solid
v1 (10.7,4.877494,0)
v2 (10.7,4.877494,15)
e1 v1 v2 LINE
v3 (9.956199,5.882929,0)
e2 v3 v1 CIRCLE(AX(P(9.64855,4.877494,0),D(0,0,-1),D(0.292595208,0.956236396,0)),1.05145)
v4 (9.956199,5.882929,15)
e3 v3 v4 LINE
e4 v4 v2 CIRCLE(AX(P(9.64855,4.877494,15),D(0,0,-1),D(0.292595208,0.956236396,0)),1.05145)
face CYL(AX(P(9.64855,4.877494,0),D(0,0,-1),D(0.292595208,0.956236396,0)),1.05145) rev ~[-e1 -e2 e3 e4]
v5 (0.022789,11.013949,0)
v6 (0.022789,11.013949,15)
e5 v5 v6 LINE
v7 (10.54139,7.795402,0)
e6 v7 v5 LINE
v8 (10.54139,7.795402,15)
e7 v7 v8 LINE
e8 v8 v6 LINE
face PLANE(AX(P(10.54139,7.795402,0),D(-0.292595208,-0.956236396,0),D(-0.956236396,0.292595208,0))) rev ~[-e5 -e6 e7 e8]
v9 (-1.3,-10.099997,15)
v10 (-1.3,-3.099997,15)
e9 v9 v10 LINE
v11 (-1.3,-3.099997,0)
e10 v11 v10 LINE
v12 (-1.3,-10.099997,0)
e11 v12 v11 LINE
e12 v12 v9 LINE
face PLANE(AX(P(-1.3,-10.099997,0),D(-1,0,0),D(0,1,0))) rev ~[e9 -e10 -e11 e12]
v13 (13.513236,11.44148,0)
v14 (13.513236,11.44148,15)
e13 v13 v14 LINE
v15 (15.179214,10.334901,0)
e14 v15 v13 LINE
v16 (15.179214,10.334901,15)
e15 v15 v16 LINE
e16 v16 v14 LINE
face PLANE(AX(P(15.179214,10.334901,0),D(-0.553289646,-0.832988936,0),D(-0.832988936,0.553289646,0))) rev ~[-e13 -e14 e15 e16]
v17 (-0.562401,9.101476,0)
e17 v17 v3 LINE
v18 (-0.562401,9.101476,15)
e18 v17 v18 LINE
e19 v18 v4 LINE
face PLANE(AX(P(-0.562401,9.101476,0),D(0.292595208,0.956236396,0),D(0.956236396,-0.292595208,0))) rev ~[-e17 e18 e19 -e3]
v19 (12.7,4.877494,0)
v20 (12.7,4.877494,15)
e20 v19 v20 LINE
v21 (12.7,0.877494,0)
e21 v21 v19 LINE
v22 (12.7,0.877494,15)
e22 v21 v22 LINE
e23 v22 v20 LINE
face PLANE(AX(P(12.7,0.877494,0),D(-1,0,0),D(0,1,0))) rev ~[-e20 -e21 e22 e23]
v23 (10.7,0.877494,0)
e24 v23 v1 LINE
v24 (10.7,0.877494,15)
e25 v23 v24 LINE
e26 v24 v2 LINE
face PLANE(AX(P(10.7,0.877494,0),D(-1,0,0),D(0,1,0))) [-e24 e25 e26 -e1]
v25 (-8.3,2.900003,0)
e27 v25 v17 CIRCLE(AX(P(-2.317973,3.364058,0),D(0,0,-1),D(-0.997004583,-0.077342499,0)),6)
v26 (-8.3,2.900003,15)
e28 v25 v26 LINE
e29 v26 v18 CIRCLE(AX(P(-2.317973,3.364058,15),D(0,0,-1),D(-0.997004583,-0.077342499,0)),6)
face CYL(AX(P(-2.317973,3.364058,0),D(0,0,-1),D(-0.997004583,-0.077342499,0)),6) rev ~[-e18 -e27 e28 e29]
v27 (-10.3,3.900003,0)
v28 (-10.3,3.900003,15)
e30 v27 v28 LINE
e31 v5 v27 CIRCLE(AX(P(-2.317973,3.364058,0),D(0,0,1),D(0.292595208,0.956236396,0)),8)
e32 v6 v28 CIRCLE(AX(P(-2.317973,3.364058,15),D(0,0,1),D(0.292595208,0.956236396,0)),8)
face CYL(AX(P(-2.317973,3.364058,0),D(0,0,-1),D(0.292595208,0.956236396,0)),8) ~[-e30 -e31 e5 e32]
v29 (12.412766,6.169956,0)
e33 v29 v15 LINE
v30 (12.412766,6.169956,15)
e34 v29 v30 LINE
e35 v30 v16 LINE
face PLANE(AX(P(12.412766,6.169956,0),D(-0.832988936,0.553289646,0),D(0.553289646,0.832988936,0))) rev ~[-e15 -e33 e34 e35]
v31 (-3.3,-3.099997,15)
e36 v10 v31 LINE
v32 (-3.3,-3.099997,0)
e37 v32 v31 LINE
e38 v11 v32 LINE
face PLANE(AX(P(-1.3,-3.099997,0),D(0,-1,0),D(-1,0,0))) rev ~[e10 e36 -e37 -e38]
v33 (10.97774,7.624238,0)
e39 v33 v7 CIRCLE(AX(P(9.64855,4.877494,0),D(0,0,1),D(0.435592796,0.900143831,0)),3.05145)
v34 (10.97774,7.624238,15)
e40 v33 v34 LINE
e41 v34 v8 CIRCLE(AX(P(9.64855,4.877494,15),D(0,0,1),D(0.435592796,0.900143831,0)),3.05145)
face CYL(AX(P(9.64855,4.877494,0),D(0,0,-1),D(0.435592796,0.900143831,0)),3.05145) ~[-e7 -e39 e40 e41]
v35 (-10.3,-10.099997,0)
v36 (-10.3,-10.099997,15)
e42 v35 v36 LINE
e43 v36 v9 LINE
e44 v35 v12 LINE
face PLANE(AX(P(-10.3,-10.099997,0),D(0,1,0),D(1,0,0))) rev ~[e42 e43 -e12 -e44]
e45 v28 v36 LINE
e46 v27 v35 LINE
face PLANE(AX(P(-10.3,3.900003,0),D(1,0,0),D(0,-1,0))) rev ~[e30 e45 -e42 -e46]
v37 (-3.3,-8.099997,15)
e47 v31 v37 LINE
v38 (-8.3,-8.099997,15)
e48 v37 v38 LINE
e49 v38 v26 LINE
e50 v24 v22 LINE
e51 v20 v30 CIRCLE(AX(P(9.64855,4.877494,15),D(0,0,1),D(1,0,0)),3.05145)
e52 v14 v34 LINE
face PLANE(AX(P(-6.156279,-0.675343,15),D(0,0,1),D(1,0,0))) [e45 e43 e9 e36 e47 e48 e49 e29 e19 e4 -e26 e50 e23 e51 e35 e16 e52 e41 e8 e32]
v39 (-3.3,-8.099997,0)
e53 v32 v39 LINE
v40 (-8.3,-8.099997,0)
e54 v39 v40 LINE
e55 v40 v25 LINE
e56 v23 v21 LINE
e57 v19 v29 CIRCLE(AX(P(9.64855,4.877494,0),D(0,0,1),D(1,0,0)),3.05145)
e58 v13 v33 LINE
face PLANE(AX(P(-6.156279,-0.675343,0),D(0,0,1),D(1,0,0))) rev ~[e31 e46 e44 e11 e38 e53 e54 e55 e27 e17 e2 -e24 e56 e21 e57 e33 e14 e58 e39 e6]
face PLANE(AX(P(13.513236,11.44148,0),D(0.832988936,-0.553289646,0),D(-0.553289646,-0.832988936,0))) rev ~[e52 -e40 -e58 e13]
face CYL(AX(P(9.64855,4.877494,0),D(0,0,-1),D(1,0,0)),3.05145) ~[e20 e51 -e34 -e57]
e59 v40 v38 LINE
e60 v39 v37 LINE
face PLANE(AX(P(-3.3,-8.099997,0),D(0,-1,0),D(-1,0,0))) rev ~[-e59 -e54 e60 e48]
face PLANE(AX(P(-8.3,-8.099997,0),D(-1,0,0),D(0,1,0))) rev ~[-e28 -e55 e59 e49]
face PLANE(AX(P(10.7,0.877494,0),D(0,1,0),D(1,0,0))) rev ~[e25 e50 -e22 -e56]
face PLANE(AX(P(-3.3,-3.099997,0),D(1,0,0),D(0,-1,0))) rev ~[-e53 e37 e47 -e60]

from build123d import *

# Parameters (mm, degrees)
F0_W     = 2
F0_H     = 4
F1_DEPTH = 15
F2_W     = 2
F2_H     = 4
F3_DEPTH = 15


# Not quite as in the source:
# - a feature names something its author has since deleted; it is built from what else it names


with BuildPart() as f1:
    # F0 (on Top) → F1 (new body)
    with BuildSketch(Plane.XY):
        with BuildLine():
            Line((7, 32.0000030547), (2, 32.0000030547))
            Line((2, 32.0000030547), (2, 43.0000030547))
            ThreePointArc((2, 43.0000030547), (4.22965477, 48.1459058579), (9.7375987459, 49.20147642))
            Line((9.7375987459, 49.20147642), (10.3227891625, 51.113949211))
            ThreePointArc((10.3227891625, 51.113949211), (3.4424209582, 50.0513163902), (0, 44.0000030547))
            Line((0, 44.0000030547), (0, 30.0000030547))
            Line((0, 30.0000030547), (9, 30.0000030547))
            Line((9, 30.0000030547), (9, 37.0000030547))
            Line((9, 37.0000030547), (7, 37.0000030547))
            Line((7, 37.0000030547), (7, 32.0000030547))
        make_face()
        Polygon((10.3227891625, 51.113949211), (9.7375987459, 49.20147642), (20.2561990964, 45.9829291287), (20.841389513, 47.8954019197), align=None)
        with BuildLine():
            Line((20.841389513, 47.8954019197), (20.2561990964, 45.9829291287))
            ThreePointArc((20.2561990964, 45.9829291287), (20.7938383415, 45.6028219427), (21, 44.9774941877))
            Line((21, 44.9774941877), (23, 44.9774941877))
            ThreePointArc((23, 44.9774941877), (22.9273260191, 45.6394915882), (22.7127657141, 46.2699564496))
            ThreePointArc((22.7127657141, 46.2699564496), (22.1205825647, 47.1207678466), (21.277739528, 47.7242382529))
            ThreePointArc((21.277739528, 47.7242382529), (21.0628558439, 47.8182107047), (20.841389513, 47.8954019197))
        make_face()
        with Locations((22, 42.9774941877)):
            Rectangle(F0_W, F0_H)
        with BuildLine():
            Line((23.8132360697, 51.5414804224), (21.277739528, 47.7242382529))
            ThreePointArc((21.277739528, 47.7242382529), (22.1205825647, 47.1207678466), (22.7127657141, 46.2699564496))
            Line((22.7127657141, 46.2699564496), (25.4792139424, 50.4349011311))
            Line((25.4792139424, 50.4349011311), (23.8132360697, 51.5414804224))
        make_face()
    extrude(amount=F1_DEPTH)


with BuildPart() as f3:
    # F2 (on Top) → F3 (new body)
    with BuildSketch(Plane.XY):
        with Locations((-37.8, -36.9225088671)):
            Rectangle(F2_W, F2_H)
        with BuildLine():
            ThreePointArc((-39.5438009036, -33.9170739261), (-39.0061616585, -34.2971811121), (-38.8, -34.9225088671))
            Line((-38.8, -34.9225088671), (-36.8, -34.9225088671))
            ThreePointArc((-36.8, -34.9225088671), (-36.8726739809, -34.2605114665), (-37.0872342859, -33.6300466052))
            ThreePointArc((-37.0872342859, -33.6300466052), (-37.6794174353, -32.7792352081), (-38.522260472, -32.1757648018))
            ThreePointArc((-38.522260472, -32.1757648018), (-38.7371441561, -32.0817923501), (-38.958610487, -32.0046011351))
            Line((-38.958610487, -32.0046011351), (-39.5438009036, -33.9170739261))
        make_face()
        Polygon((-50.0624012541, -30.6985266348), (-39.5438009036, -33.9170739261), (-38.958610487, -32.0046011351), (-49.4772108375, -28.7860538438), align=None)
        with BuildLine():
            ThreePointArc((-57.8, -36.9), (-55.57034523, -31.7540971969), (-50.0624012541, -30.6985266348))
            Line((-50.0624012541, -30.6985266348), (-49.4772108375, -28.7860538438))
            ThreePointArc((-49.4772108375, -28.7860538438), (-56.3575790418, -29.8486866645), (-59.8, -35.9))
            Line((-59.8, -35.9), (-59.8, -49.9))
            Line((-59.8, -49.9), (-50.8, -49.9))
            Line((-50.8, -49.9), (-50.8, -42.9))
            Line((-50.8, -42.9), (-52.8, -42.9))
            Line((-52.8, -42.9), (-52.8, -47.9))
            Line((-52.8, -47.9), (-57.8, -47.9))
            Line((-57.8, -47.9), (-57.8, -36.9))
        make_face()
        with BuildLine():
            ThreePointArc((-38.522260472, -32.1757648018), (-37.6794174353, -32.7792352081), (-37.0872342859, -33.6300466052))
            Line((-37.0872342859, -33.6300466052), (-34.3207860576, -29.4651019236))
            Line((-34.3207860576, -29.4651019236), (-35.9867639303, -28.3585226323))
            Line((-35.9867639303, -28.3585226323), (-38.522260472, -32.1757648018))
        make_face()
    extrude(amount=F3_DEPTH)


with BuildPart() as f3b:
    # F2 (on Top) → F3, piece 2 (new body)
    with BuildSketch(Plane.XY):
        with Locations((33.034186706, 0.0025241677)):
            Rectangle(F2_W, F2_H)
        with BuildLine():
            ThreePointArc((31.2903858024, 3.0079591087), (31.8280250475, 2.6278519227), (32.034186706, 2.0025241677))
            Line((32.034186706, 2.0025241677), (34.034186706, 2.0025241677))
            ThreePointArc((34.034186706, 2.0025241677), (33.9615127251, 2.6645215683), (33.7469524201, 3.2949864296))
            ThreePointArc((33.7469524201, 3.2949864296), (33.1547692707, 4.1457978267), (32.311926234, 4.749268233))
            ThreePointArc((32.311926234, 4.749268233), (32.0970425499, 4.8432406847), (31.875576219, 4.9204318997))
            Line((31.875576219, 4.9204318997), (31.2903858024, 3.0079591087))
        make_face()
        Polygon((20.7717854519, 6.2265064), (31.2903858024, 3.0079591087), (31.875576219, 4.9204318997), (21.3569758685, 8.138979191), align=None)
        with BuildLine():
            ThreePointArc((13.034186706, 0.0250330348), (15.2638414761, 5.1709358379), (20.7717854519, 6.2265064))
            Line((20.7717854519, 6.2265064), (21.3569758685, 8.138979191))
            ThreePointArc((21.3569758685, 8.138979191), (14.4766076642, 7.0763463703), (11.034186706, 1.0250330348))
            Line((11.034186706, 1.0250330348), (11.034186706, -12.9749669652))
            Line((11.034186706, -12.9749669652), (20.034186706, -12.9749669652))
            Line((20.034186706, -12.9749669652), (20.034186706, -5.9749669652))
            Line((20.034186706, -5.9749669652), (18.034186706, -5.9749669652))
            Line((18.034186706, -5.9749669652), (18.034186706, -10.9749669652))
            Line((18.034186706, -10.9749669652), (13.034186706, -10.9749669652))
            Line((13.034186706, -10.9749669652), (13.034186706, 0.0250330348))
        make_face()
        with BuildLine():
            ThreePointArc((32.311926234, 4.749268233), (33.1547692707, 4.1457978267), (33.7469524201, 3.2949864296))
            Line((33.7469524201, 3.2949864296), (36.5134006484, 7.4599311112))
            Line((36.5134006484, 7.4599311112), (34.8474227758, 8.5665104025))
            Line((34.8474227758, 8.5665104025), (32.311926234, 4.749268233))
        make_face()
    extrude(amount=F3_DEPTH)


with BuildPart() as f3c:
    # F2 (on Top) → F3, piece 3 (new body)
    with BuildSketch(Plane.XY):
        with Locations((-12.8, -36.9225088671)):
            Rectangle(F2_W, F2_H)
        with BuildLine():
            ThreePointArc((-14.5438009036, -33.9170739261), (-14.0061616585, -34.2971811121), (-13.8, -34.9225088671))
            Line((-13.8, -34.9225088671), (-11.8, -34.9225088671))
            ThreePointArc((-11.8, -34.9225088671), (-11.8726739809, -34.2605114665), (-12.0872342859, -33.6300466052))
            ThreePointArc((-12.0872342859, -33.6300466052), (-12.6794174353, -32.7792352081), (-13.522260472, -32.1757648018))
            ThreePointArc((-13.522260472, -32.1757648018), (-13.7371441561, -32.0817923501), (-13.958610487, -32.0046011351))
            Line((-13.958610487, -32.0046011351), (-14.5438009036, -33.9170739261))
        make_face()
        Polygon((-25.0624012541, -30.6985266348), (-14.5438009036, -33.9170739261), (-13.958610487, -32.0046011351), (-24.4772108375, -28.7860538438), align=None)
        with BuildLine():
            ThreePointArc((-32.8, -36.9), (-30.57034523, -31.7540971969), (-25.0624012541, -30.6985266348))
            Line((-25.0624012541, -30.6985266348), (-24.4772108375, -28.7860538438))
            ThreePointArc((-24.4772108375, -28.7860538438), (-31.3575790418, -29.8486866645), (-34.8, -35.9))
            Line((-34.8, -35.9), (-34.8, -49.9))
            Line((-34.8, -49.9), (-25.8, -49.9))
            Line((-25.8, -49.9), (-25.8, -42.9))
            Line((-25.8, -42.9), (-27.8, -42.9))
            Line((-27.8, -42.9), (-27.8, -47.9))
            Line((-27.8, -47.9), (-32.8, -47.9))
            Line((-32.8, -47.9), (-32.8, -36.9))
        make_face()
        with BuildLine():
            ThreePointArc((-13.522260472, -32.1757648018), (-12.6794174353, -32.7792352081), (-12.0872342859, -33.6300466052))
            Line((-12.0872342859, -33.6300466052), (-9.3207860576, -29.4651019236))
            Line((-9.3207860576, -29.4651019236), (-10.9867639303, -28.3585226323))
            Line((-10.9867639303, -28.3585226323), (-13.522260472, -32.1757648018))
        make_face()
    extrude(amount=F3_DEPTH)


with BuildPart() as f3d:
    # F2 (on Top) → F3, piece 4 (new body)
    with BuildSketch(Plane.XY):
        with Locations((58.034186706, 0.0025241677)):
            Rectangle(F2_W, F2_H)
        with BuildLine():
            ThreePointArc((56.2903858024, 3.0079591087), (56.8280250475, 2.6278519227), (57.034186706, 2.0025241677))
            Line((57.034186706, 2.0025241677), (59.034186706, 2.0025241677))
            ThreePointArc((59.034186706, 2.0025241677), (58.9615127251, 2.6645215683), (58.7469524201, 3.2949864296))
            ThreePointArc((58.7469524201, 3.2949864296), (58.1547692707, 4.1457978267), (57.311926234, 4.749268233))
            ThreePointArc((57.311926234, 4.749268233), (57.0970425499, 4.8432406847), (56.875576219, 4.9204318997))
            Line((56.875576219, 4.9204318997), (56.2903858024, 3.0079591087))
        make_face()
        Polygon((45.7717854519, 6.2265064), (56.2903858024, 3.0079591087), (56.875576219, 4.9204318997), (46.3569758685, 8.138979191), align=None)
        with BuildLine():
            ThreePointArc((38.034186706, 0.0250330348), (40.2638414761, 5.1709358379), (45.7717854519, 6.2265064))
            Line((45.7717854519, 6.2265064), (46.3569758685, 8.138979191))
            ThreePointArc((46.3569758685, 8.138979191), (39.4766076642, 7.0763463703), (36.034186706, 1.0250330348))
            Line((36.034186706, 1.0250330348), (36.034186706, -12.9749669652))
            Line((36.034186706, -12.9749669652), (45.034186706, -12.9749669652))
            Line((45.034186706, -12.9749669652), (45.034186706, -5.9749669652))
            Line((45.034186706, -5.9749669652), (43.034186706, -5.9749669652))
            Line((43.034186706, -5.9749669652), (43.034186706, -10.9749669652))
            Line((43.034186706, -10.9749669652), (38.034186706, -10.9749669652))
            Line((38.034186706, -10.9749669652), (38.034186706, 0.0250330348))
        make_face()
        with BuildLine():
            ThreePointArc((57.311926234, 4.749268233), (58.1547692707, 4.1457978267), (58.7469524201, 3.2949864296))
            Line((58.7469524201, 3.2949864296), (61.5134006484, 7.4599311112))
            Line((61.5134006484, 7.4599311112), (59.8474227758, 8.5665104025))
            Line((59.8474227758, 8.5665104025), (57.311926234, 4.749268233))
        make_face()
    extrude(amount=F3_DEPTH)


with BuildPart() as f3e:
    # F2 (on Top) → F3, piece 5 (new body)
    with BuildSketch(Plane.XY):
        with Locations((12.2, -36.9225088671)):
            Rectangle(F2_W, F2_H)
        with BuildLine():
            ThreePointArc((10.4561990964, -33.9170739261), (10.9938383415, -34.2971811121), (11.2, -34.9225088671))
            Line((11.2, -34.9225088671), (13.2, -34.9225088671))
            ThreePointArc((13.2, -34.9225088671), (13.1273260191, -34.2605114665), (12.9127657141, -33.6300466052))
            ThreePointArc((12.9127657141, -33.6300466052), (12.3205825647, -32.7792352081), (11.477739528, -32.1757648018))
            ThreePointArc((11.477739528, -32.1757648018), (11.2628558439, -32.0817923501), (11.041389513, -32.0046011351))
            Line((11.041389513, -32.0046011351), (10.4561990964, -33.9170739261))
        make_face()
        Polygon((-0.0624012541, -30.6985266348), (10.4561990964, -33.9170739261), (11.041389513, -32.0046011351), (0.5227891625, -28.7860538438), align=None)
        with BuildLine():
            ThreePointArc((-7.8, -36.9), (-5.57034523, -31.7540971969), (-0.0624012541, -30.6985266348))
            Line((-0.0624012541, -30.6985266348), (0.5227891625, -28.7860538438))
            ThreePointArc((0.5227891625, -28.7860538438), (-6.3575790418, -29.8486866645), (-9.8, -35.9))
            Line((-9.8, -35.9), (-9.8, -49.9))
            Line((-9.8, -49.9), (-0.8, -49.9))
            Line((-0.8, -49.9), (-0.8, -42.9))
            Line((-0.8, -42.9), (-2.8, -42.9))
            Line((-2.8, -42.9), (-2.8, -47.9))
            Line((-2.8, -47.9), (-7.8, -47.9))
            Line((-7.8, -47.9), (-7.8, -36.9))
        make_face()
        with BuildLine():
            ThreePointArc((11.477739528, -32.1757648018), (12.3205825647, -32.7792352081), (12.9127657141, -33.6300466052))
            Line((12.9127657141, -33.6300466052), (15.6792139424, -29.4651019236))
            Line((15.6792139424, -29.4651019236), (14.0132360697, -28.3585226323))
            Line((14.0132360697, -28.3585226323), (11.477739528, -32.1757648018))
        make_face()
    extrude(amount=F3_DEPTH)


with BuildPart() as f1_1:
    # F5: moved
    add(f1.part.moved(Location((-10.3, -40.1, 0))))


solid = f1_1.part
